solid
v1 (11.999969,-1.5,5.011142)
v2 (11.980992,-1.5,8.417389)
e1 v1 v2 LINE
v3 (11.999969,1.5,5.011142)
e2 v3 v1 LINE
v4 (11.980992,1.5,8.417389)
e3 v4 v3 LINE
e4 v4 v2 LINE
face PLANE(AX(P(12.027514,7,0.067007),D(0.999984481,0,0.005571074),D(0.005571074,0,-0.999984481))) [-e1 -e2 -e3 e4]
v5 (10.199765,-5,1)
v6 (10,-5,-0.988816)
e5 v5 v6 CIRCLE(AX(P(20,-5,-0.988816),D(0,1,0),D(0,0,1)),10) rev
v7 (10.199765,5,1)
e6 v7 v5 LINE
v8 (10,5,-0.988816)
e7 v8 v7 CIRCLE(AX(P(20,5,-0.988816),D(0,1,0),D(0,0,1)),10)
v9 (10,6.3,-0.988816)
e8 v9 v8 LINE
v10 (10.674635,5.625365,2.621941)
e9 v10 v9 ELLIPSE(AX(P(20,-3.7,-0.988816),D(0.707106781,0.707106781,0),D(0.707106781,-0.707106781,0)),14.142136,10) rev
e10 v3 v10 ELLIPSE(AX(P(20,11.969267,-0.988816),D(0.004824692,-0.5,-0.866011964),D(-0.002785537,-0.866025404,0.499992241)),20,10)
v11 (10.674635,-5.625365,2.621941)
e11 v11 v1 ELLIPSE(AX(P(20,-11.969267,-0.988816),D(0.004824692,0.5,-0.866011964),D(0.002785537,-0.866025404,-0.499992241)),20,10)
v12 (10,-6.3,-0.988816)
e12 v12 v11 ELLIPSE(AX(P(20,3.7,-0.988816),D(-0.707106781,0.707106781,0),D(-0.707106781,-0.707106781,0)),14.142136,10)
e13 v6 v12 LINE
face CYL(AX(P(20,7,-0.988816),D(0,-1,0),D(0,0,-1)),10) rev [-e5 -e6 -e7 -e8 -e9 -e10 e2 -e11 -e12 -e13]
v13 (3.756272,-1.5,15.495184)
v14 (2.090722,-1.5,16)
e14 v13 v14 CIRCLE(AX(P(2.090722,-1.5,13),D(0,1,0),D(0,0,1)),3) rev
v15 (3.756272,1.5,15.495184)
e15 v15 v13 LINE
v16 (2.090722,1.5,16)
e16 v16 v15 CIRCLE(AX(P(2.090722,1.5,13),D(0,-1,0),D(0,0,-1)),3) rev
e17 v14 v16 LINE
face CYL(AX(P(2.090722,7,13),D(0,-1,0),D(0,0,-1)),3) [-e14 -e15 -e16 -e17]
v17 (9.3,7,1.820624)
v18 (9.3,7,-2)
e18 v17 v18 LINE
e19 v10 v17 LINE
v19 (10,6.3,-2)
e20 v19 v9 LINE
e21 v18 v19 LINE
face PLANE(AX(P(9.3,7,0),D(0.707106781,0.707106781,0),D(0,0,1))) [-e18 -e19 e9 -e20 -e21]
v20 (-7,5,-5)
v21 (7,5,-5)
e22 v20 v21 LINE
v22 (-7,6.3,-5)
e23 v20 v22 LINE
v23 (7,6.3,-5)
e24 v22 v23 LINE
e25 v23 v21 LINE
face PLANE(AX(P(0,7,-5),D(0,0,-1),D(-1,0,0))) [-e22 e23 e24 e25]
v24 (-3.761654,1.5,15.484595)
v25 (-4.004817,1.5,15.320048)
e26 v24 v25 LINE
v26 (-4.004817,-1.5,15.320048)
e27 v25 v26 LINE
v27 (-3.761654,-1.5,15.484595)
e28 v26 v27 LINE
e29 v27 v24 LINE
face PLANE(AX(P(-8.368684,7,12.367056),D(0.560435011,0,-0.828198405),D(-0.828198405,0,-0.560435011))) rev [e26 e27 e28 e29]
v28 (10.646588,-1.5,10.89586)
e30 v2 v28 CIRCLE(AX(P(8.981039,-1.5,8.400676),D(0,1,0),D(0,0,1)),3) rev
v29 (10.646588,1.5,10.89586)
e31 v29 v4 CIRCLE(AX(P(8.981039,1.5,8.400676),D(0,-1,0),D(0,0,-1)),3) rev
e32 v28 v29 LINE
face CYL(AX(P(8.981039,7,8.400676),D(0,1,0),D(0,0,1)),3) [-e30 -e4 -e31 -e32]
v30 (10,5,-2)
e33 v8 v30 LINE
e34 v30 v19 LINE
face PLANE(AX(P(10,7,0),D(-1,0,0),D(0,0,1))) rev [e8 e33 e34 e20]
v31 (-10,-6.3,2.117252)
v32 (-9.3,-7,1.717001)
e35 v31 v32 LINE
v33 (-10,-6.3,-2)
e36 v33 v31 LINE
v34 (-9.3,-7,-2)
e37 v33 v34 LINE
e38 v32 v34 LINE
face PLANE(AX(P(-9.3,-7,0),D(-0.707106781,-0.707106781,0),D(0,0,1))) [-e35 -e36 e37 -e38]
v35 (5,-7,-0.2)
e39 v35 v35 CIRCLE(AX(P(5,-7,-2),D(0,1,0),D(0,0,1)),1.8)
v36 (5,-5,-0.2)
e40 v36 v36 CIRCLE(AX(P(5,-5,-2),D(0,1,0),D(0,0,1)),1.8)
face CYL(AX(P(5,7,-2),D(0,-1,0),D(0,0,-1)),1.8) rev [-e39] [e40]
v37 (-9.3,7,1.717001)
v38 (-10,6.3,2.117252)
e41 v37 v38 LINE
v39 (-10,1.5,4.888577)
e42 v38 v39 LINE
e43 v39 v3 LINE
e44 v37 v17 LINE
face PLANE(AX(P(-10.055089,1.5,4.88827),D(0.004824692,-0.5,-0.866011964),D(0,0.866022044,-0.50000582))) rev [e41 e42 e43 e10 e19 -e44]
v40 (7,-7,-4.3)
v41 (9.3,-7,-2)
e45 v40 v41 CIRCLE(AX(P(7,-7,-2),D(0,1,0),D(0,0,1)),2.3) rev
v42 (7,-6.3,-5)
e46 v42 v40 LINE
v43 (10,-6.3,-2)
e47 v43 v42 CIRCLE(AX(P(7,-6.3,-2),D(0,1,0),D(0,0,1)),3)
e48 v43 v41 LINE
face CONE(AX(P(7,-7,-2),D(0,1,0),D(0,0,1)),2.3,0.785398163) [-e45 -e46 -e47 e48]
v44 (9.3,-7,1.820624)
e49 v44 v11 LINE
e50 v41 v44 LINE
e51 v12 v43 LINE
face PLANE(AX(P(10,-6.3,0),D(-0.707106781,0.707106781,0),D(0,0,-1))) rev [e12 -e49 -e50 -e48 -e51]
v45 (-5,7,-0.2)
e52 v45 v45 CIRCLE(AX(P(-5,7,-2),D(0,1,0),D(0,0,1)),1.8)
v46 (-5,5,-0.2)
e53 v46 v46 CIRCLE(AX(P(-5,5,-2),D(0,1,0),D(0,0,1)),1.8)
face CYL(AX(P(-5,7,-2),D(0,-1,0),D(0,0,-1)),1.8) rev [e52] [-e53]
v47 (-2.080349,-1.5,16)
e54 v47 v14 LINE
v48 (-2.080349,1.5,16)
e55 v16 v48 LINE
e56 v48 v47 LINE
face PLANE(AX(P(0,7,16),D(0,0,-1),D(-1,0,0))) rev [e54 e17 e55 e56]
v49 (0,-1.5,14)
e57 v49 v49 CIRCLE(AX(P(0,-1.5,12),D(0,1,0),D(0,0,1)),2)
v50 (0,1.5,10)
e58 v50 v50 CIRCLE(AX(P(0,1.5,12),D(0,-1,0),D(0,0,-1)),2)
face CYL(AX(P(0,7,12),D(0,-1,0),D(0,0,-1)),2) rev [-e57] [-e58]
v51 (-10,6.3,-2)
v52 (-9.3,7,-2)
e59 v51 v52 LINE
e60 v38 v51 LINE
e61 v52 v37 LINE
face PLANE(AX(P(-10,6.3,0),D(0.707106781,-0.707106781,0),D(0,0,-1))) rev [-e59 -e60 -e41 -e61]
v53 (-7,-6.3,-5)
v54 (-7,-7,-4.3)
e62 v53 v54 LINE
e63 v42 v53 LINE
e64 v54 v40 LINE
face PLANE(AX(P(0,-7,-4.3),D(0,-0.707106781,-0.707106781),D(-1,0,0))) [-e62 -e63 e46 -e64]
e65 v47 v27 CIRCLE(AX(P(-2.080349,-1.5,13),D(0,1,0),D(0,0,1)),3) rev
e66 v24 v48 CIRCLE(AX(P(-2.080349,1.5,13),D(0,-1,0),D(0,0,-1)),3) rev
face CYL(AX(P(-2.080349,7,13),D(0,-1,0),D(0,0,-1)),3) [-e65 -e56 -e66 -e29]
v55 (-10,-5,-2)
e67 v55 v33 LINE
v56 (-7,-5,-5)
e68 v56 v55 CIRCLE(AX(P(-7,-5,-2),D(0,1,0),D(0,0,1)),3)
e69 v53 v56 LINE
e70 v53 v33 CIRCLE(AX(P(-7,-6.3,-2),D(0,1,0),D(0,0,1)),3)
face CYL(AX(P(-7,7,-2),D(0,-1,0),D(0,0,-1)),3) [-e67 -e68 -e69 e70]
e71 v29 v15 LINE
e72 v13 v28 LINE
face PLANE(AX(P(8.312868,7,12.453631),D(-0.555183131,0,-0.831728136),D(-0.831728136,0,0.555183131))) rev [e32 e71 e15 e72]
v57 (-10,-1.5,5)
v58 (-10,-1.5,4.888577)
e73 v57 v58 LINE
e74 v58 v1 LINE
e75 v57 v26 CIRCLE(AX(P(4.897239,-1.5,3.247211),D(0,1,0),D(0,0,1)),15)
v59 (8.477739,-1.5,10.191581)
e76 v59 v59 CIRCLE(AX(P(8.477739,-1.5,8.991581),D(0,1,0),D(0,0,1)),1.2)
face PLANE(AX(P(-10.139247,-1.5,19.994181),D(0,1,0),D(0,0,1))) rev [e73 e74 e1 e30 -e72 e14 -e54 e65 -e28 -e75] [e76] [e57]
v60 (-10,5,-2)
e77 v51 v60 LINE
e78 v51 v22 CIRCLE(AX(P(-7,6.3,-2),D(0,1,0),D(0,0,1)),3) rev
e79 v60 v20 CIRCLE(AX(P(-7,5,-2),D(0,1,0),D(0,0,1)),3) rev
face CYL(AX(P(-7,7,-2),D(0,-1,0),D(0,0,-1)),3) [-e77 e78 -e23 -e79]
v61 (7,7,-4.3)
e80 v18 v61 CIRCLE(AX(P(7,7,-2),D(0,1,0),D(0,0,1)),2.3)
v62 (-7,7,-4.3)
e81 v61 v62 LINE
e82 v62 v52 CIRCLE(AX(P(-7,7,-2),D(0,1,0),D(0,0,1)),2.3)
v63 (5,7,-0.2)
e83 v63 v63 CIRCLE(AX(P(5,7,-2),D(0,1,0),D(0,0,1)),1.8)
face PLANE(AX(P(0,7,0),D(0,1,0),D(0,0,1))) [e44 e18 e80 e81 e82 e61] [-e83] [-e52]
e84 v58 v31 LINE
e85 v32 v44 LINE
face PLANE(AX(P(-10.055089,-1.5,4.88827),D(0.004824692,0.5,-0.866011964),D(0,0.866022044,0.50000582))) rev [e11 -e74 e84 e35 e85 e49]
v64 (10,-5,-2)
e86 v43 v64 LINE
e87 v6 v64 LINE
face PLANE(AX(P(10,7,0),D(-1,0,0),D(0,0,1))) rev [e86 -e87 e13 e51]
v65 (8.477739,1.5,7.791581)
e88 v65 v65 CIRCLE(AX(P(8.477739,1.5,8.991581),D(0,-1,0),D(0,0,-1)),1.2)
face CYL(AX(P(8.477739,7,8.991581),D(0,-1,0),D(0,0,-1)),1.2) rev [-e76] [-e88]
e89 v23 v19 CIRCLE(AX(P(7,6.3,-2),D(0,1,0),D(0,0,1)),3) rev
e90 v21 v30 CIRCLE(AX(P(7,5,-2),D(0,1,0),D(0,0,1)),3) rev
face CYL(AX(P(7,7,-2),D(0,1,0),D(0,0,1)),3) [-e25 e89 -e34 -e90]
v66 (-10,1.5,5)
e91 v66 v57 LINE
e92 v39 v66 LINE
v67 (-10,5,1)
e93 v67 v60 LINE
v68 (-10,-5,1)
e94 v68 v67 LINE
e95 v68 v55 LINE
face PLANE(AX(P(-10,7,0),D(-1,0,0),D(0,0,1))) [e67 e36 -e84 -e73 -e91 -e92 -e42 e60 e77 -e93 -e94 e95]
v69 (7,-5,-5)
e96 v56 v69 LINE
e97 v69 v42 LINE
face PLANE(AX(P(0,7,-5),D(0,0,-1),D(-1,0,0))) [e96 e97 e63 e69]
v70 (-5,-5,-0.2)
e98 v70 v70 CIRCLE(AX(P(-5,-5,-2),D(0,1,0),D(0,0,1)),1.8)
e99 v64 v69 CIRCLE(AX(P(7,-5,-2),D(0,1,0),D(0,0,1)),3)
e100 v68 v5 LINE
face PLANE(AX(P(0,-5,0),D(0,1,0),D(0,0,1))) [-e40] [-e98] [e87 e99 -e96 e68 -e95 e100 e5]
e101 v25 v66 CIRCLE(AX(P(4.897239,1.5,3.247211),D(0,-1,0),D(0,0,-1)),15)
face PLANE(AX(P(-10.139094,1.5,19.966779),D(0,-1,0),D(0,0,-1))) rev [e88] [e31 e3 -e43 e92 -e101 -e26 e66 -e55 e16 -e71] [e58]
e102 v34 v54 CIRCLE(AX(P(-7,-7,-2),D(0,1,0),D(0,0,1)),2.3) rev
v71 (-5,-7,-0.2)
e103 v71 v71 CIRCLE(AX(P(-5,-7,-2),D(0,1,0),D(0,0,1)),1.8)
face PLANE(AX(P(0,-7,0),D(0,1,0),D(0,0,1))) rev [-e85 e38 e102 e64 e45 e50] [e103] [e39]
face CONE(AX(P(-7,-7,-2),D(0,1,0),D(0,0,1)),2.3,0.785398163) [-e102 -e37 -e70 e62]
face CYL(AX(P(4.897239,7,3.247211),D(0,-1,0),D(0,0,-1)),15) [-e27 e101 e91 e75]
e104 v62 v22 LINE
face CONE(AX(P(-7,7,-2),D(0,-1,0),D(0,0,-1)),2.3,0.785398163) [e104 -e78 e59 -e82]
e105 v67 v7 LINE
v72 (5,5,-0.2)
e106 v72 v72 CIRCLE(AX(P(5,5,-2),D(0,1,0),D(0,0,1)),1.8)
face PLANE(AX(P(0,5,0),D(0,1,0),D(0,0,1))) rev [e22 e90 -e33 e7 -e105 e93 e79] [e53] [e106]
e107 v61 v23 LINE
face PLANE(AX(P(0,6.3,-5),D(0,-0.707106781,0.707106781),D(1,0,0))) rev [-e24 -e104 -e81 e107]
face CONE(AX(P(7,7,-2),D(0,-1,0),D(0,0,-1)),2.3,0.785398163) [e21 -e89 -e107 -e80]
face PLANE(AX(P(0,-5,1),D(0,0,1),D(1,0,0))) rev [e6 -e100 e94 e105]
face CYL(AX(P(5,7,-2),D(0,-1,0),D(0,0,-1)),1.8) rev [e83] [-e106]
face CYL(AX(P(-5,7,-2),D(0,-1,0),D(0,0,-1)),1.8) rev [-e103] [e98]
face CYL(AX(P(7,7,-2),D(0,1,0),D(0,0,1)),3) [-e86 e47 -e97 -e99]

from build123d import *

# Parameters (mm, degrees)
SKETCH1_R           = 1.8
SKETCH1_R_2         = 1.2
SKETCH1_R_3         = 2
BOSS_EXTRUDE1_DEPTH = 7
SKETCH1_3_W         = 20
SKETCH1_3_H         = 6
SKETCH1_3_R         = 1.8
CUT_EXTRUDE1_DEPTH  = 5
FILLET1_R           = 3
CHAMFER3_SIZE       = 0.7
CUT_EXTRUDE2_DEPTH  = 29.072613197
FILLET2_R           = 10
FILLET3_R           = 3


with BuildPart() as part:
    # Sketch1 → Boss-Extrude1 (new, symmetric)
    with BuildSketch(Plane(origin=(0, 0, 0), x_dir=(1, 0, 0), z_dir=(0, 1, 0))):
        with BuildLine():
            Line((10, 5), (-10, 5))
            Line((-10, 5), (-10, -5))
            ThreePointArc((-10, -5), (-8.073014031, -10.781966564), (-4.004817267, -15.320048466))
            Line((-4.004817267, -15.320048466), (-3, -16))
            Line((-3, -16), (3, -16))
            Line((3, -16), (11.972113592, -10.011064555))
            Line((11.972113592, -10.011064555), (11.999968963, -5.011142148))
            Line((11.999968963, -5.011142148), (10, -5))
            Line((10, -5), (10, 5))
        make_face()
        with Locations(Location((-5, 2, 0), (0, 0, 270))):
            Circle(SKETCH1_R, mode=Mode.SUBTRACT)
        with Locations(Location((5, 2, 0), (0, 0, 270))):
            Circle(SKETCH1_R, mode=Mode.SUBTRACT)
        with Locations(Location((8.477738981, -8.991581315, 0), (0, 0, 270))):
            Circle(SKETCH1_R_2, mode=Mode.SUBTRACT)
        with Locations(Location((0, -12, 0), (0, 0, 270))):
            Circle(SKETCH1_R_3, mode=Mode.SUBTRACT)
    extrude(amount=BOSS_EXTRUDE1_DEPTH, both=True)

    # Sketch1<3> → Cut-Extrude1 (cut, symmetric)
    # profile 1 of 2: a face of its own
    with BuildSketch(Plane(origin=(0, 0, 0), x_dir=(1, 0, 0), z_dir=(0, 1, 0))):
        with Locations((0, 2)):
            Rectangle(SKETCH1_3_W, SKETCH1_3_H)
        with Locations(Location((-5, 2, 0), (0, 0, 270))):
            Circle(SKETCH1_3_R, mode=Mode.SUBTRACT)
        with Locations(Location((5, 2, 0), (0, 0, 270))):
            Circle(SKETCH1_3_R, mode=Mode.SUBTRACT)
    # profile 2 of 2: a face of its own
    with BuildSketch(Plane(origin=(0, 0, 0), x_dir=(1, 0, 0), z_dir=(0, 1, 0))):
        with BuildLine():
            Line((-3, -16), (-4.004817267, -15.320048466))
            ThreePointArc((-4.004817267, -15.320048466), (-3.509286078, -15.670187568), (-3, -16))
        make_face()
    extrude(amount=CUT_EXTRUDE1_DEPTH, both=True, mode=Mode.SUBTRACT)

    # Fillet1
    fillet1_edges = [part.edges().sort_by_distance(p)[0] for p in [
        (-10, 6, -5),
        (10, 6, -5),
        (-10, -6, -5),
        (10, -6, -5),
    ]]
    fillet(fillet1_edges, radius=FILLET1_R)

    # Chamfer3
    chamfer3_edges = [part.edges().sort_by_distance(p)[0] for p in [
        (10, -7, 1.5),
        (-10, 7, 1.5),
        (-10, -7, 1.5),
        (10, 7, 1.5),
        (0, -7, -5),
        (9.121320344, -7, -4.121320344),
        (-9.121320344, -7, -4.121320344),
        (0, 7, -5),
        (9.121320344, 7, -4.121320344),
        (-9.121320344, 7, -4.121320344),
    ]]
    chamfer(chamfer3_edges, length=CHAMFER3_SIZE)

    # Sketch2 → Cut-Extrude2 (cut, through all)
    with BuildSketch(Plane(origin=(12.027513532, 0, 0.067007209), x_dir=(0.005571074109334343, 0, -0.9999844814462214), z_dir=(0.9999844814462214, 0, 0.005571074109334343))):
        Polygon((-20.022955032, 1.5), (-20.022955032, 7), (-1.768785186, 7), (-4.944211666, 1.5), align=None)
        Polygon((-20.050357448, -7), (-20.050357448, -1.5), (-4.944211666, -1.5), (-1.768785186, -7), align=None)
    extrude(amount=-CUT_EXTRUDE2_DEPTH, mode=Mode.SUBTRACT)

    # Fillet2
    # the kernel refuses this fillet: 10 mm, written as the material it adds along each edge
    with BuildSketch(Plane(origin=(10, 16.472041172, 5), x_dir=(0, 0, -1), z_dir=(0, -1, 0))) as fillet2_piece_1_section:
        with BuildLine():
            CenterArc((5.988816469, 10), FILLET2_R, 233.130398738, 36.869601262)
            Line((-0.011142148, 1.999968963), (0, 0))
            Line((0, 0), (5.988816469, 0))
        make_face()
    fillet2_piece_1 = extrude(amount=32.944082344, mode=Mode.PRIVATE)
    fillet2_piece_1 = split(fillet2_piece_1, bisect_by=Plane(origin=(10, 5, 5), z_dir=(0, 1, 0)), keep=Keep.TOP, mode=Mode.PRIVATE)
    fillet2_piece_1 = split(fillet2_piece_1, bisect_by=Plane(origin=(10.036117741, 12.729030879, -1.482983393), z_dir=(0.004824691705049313, -0.4999999999999978, -0.8660119643226377)), keep=Keep.TOP, mode=Mode.PRIVATE)
    fillet2_piece_1 = split(fillet2_piece_1, bisect_by=Plane(origin=(4.913979414, 11.386020586, 5), z_dir=(-0.707106781186548, -0.7071067811865471, 0)), keep=Keep.TOP, mode=Mode.PRIVATE)
    add(fillet2_piece_1)
    with BuildSketch(Plane(origin=(10, 16.472041172, 5), x_dir=(0, 0, -1), z_dir=(0, -1, 0))) as fillet2_piece_2_section:
        with BuildLine():
            CenterArc((5.988816469, 10), FILLET2_R, 233.130398738, 36.869601262)
            Line((-0.011142148, 1.999968963), (0, 0))
            Line((0, 0), (5.988816469, 0))
        make_face()
    fillet2_piece_2 = extrude(amount=32.944082344, mode=Mode.PRIVATE)
    fillet2_piece_2 = split(fillet2_piece_2, bisect_by=Plane(origin=(10, 16.472041172, 1), z_dir=(0, 0, 1)), keep=Keep.TOP, mode=Mode.PRIVATE)
    fillet2_piece_2 = split(fillet2_piece_2, bisect_by=Plane(origin=(21.386020586, 5.086020586, 5), z_dir=(-0.707106781186548, 0.7071067811865471, 0)), keep=Keep.TOP, mode=Mode.PRIVATE)
    fillet2_piece_2 = split(fillet2_piece_2, bisect_by=Plane(origin=(9.956645221, 11.979030879, 12.782001339), z_dir=(0.004824691705049311, 0.4999999999999981, -0.8660119643226375)), keep=Keep.TOP, mode=Mode.PRIVATE)
    fillet2_piece_2 = split(fillet2_piece_2, bisect_by=Plane(origin=(10.036117741, 12.729030879, -1.482983393), z_dir=(0.004824691705049313, -0.4999999999999978, -0.8660119643226377)), keep=Keep.TOP, mode=Mode.PRIVATE)
    fillet2_piece_2 = split(fillet2_piece_2, bisect_by=Plane(origin=(4.913979414, 11.386020586, 5), z_dir=(-0.707106781186548, -0.7071067811865471, 0)), keep=Keep.TOP, mode=Mode.PRIVATE)
    add(fillet2_piece_2)
    with BuildSketch(Plane(origin=(10, 16.472041172, 5), x_dir=(0, 0, -1), z_dir=(0, -1, 0))) as fillet2_piece_3_section:
        with BuildLine():
            CenterArc((5.988816469, 10), FILLET2_R, 233.130398738, 36.869601262)
            Line((-0.011142148, 1.999968963), (0, 0))
            Line((0, 0), (5.988816469, 0))
        make_face()
    fillet2_piece_3 = extrude(amount=32.944082344, mode=Mode.PRIVATE)
    fillet2_piece_3 = split(fillet2_piece_3, bisect_by=Plane(origin=(10, -5, 5), z_dir=(0, -1, 0)), keep=Keep.TOP, mode=Mode.PRIVATE)
    fillet2_piece_3 = split(fillet2_piece_3, bisect_by=Plane(origin=(21.386020586, 5.086020586, 5), z_dir=(-0.707106781186548, 0.7071067811865471, 0)), keep=Keep.TOP, mode=Mode.PRIVATE)
    fillet2_piece_3 = split(fillet2_piece_3, bisect_by=Plane(origin=(9.956645221, 11.979030879, 12.782001339), z_dir=(0.004824691705049311, 0.4999999999999981, -0.8660119643226375)), keep=Keep.TOP, mode=Mode.PRIVATE)
    add(fillet2_piece_3)

    # Fillet3
    fillet3_edges = [part.edges().sort_by_distance(p)[0] for p in [
        (11.972113592, 0, 10.011064555),
        (3, 0, 16),
        (-3, 0, 16),
    ]]
    fillet(fillet3_edges, radius=FILLET3_R)


solid = part.part
